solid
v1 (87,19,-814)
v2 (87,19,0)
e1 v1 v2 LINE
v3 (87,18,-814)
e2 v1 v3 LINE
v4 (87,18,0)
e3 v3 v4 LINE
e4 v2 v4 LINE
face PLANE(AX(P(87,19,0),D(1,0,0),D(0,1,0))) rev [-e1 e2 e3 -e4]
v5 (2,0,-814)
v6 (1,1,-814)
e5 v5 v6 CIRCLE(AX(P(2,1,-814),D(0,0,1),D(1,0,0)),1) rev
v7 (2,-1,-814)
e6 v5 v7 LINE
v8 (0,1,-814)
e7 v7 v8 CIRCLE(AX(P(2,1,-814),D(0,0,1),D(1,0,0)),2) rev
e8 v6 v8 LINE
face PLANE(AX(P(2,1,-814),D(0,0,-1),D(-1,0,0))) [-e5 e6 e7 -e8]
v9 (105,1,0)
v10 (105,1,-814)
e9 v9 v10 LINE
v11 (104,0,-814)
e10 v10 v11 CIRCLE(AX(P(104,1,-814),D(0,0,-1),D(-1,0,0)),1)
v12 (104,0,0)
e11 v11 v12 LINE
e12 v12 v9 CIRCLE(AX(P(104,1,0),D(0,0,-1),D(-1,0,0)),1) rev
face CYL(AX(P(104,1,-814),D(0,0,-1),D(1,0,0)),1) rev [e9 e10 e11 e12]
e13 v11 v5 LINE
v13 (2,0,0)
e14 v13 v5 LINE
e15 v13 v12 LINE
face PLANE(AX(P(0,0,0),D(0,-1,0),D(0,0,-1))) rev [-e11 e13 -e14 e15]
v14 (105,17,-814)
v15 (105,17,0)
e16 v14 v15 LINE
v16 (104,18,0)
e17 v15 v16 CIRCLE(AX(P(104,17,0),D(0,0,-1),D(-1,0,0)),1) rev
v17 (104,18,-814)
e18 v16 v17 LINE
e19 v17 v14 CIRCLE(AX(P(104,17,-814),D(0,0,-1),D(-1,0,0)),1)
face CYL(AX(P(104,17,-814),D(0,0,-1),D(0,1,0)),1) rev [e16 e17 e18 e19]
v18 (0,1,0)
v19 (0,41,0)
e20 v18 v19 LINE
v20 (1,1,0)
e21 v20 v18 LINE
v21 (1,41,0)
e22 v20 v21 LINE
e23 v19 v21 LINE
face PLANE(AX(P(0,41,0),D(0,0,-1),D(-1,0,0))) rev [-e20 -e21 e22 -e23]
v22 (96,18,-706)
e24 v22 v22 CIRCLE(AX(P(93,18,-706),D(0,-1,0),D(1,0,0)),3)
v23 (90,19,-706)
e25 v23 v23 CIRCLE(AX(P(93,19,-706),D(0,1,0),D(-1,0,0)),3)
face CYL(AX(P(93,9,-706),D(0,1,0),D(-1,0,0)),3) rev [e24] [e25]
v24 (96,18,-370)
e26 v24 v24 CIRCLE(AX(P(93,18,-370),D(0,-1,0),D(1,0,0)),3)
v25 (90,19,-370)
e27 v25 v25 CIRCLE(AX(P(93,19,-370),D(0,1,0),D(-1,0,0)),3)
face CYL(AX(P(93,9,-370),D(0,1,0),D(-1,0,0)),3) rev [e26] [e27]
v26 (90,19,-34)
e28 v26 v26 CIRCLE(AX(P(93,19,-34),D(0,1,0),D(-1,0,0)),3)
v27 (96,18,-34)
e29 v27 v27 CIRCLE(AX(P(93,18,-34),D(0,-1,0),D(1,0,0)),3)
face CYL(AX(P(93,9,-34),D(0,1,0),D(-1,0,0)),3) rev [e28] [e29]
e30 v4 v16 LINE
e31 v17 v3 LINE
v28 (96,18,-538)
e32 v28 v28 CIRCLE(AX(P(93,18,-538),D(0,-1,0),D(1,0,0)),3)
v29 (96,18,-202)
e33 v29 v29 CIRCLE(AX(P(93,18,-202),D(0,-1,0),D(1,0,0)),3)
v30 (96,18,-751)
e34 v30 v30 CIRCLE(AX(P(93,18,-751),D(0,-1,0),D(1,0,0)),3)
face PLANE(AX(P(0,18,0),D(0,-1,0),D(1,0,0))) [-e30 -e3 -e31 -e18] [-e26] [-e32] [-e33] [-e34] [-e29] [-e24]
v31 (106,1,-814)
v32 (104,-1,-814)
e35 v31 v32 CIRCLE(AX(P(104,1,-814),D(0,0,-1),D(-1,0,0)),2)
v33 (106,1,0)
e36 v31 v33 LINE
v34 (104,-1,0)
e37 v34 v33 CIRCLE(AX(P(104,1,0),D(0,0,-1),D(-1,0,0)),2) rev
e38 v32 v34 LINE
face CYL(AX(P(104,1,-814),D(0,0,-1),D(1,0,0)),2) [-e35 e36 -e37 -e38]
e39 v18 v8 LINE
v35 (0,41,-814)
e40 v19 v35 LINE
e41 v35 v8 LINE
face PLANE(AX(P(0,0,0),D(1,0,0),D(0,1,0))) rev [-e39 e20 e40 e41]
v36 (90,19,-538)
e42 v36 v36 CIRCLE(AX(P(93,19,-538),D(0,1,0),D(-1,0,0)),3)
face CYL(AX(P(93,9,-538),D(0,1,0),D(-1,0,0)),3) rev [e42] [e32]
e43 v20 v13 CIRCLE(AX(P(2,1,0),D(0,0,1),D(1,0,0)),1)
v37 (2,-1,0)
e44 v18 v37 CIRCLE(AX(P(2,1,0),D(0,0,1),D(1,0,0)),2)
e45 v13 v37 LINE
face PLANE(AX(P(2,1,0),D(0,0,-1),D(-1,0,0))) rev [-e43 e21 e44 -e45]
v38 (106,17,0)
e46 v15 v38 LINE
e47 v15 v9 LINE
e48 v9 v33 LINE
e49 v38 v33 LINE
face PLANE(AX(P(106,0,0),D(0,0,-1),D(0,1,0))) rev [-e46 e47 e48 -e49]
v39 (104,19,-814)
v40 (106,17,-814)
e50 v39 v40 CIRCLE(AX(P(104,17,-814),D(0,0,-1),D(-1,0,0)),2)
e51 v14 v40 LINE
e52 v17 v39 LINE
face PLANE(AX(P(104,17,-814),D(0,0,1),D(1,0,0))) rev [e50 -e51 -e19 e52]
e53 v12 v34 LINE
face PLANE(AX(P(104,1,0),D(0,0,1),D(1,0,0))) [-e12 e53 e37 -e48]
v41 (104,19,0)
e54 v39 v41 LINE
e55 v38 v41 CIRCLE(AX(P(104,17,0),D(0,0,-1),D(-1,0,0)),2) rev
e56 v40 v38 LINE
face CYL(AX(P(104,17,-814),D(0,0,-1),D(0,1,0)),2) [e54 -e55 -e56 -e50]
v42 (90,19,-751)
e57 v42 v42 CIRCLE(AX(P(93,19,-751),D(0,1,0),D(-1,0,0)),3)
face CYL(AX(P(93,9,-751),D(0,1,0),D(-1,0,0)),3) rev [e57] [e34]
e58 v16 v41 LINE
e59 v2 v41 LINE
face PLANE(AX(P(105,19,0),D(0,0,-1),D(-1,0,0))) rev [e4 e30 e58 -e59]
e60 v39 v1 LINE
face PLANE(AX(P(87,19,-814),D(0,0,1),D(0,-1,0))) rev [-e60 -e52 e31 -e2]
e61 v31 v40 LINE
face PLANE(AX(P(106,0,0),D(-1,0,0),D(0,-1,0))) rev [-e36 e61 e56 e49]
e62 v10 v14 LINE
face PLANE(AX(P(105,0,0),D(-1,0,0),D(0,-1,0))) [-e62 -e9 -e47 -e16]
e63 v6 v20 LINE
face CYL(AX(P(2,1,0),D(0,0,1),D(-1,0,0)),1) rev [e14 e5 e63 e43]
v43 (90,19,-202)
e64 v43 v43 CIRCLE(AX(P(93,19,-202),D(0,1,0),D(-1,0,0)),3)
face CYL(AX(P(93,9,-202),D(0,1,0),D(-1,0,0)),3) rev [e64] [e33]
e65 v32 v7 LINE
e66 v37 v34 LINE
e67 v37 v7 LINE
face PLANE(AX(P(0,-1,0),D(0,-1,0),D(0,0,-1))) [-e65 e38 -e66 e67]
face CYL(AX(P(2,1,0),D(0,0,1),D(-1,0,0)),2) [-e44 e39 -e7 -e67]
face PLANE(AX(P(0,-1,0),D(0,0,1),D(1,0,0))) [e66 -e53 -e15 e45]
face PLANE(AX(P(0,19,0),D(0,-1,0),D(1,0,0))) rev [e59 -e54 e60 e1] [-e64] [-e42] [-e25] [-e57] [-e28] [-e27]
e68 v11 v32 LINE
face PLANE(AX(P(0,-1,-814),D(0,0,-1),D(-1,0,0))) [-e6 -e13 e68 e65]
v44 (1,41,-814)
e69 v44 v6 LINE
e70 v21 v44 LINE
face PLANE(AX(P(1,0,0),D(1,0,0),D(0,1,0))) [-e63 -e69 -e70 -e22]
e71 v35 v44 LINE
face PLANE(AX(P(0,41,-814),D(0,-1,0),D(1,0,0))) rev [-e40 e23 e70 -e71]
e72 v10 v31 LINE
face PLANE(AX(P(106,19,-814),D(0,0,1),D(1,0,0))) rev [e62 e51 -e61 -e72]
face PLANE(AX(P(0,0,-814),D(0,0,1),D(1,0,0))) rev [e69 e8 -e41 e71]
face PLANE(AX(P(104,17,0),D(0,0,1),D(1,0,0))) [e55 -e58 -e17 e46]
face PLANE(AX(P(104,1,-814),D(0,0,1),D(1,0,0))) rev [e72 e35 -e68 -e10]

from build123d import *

# Parameters (mm, degrees)
SKETCH1_W                    = 106
SKETCH1_H                    = 814
BASE_FLANGE1_DEPTH           = 1
EDGE_FLANGE1_STRIP_W         = 6
EDGE_FLANGE1_STRIP_H         = 1
EDGE_FLANGE1_STRIP_CUT_DEPTH = 814
EDGE_FLANGE1_DEPTH           = 814
EDGE_FLANGE2_STRIP_W         = 6
EDGE_FLANGE2_STRIP_H         = 1
EDGE_FLANGE2_STRIP_CUT_DEPTH = 814
EDGE_FLANGE2_DEPTH           = 814
EDGE_FLANGE4_STRIP_W         = 6
EDGE_FLANGE4_STRIP_H         = 1
EDGE_FLANGE4_STRIP_CUT_DEPTH = 814
EDGE_FLANGE4_DEPTH           = 814
SKETCH19_R                   = 3
CUT_EXTRUDE2_DEPTH           = 10


# Sheet-metal steps are written as plain solids
with BuildPart() as part:
    # Sketch1 → Base-Flange1 (new body)
    with BuildSketch(Plane(origin=(0, 0, 0), x_dir=(1, 0, 0), z_dir=(0, 1, 0))):
        with Locations((53, 407)):
            Rectangle(SKETCH1_W, SKETCH1_H)
    extrude(amount=-BASE_FLANGE1_DEPTH)

    # Edge-Flange1 strip (across the edge) → Edge-Flange1 strip cut (cut)
    with BuildSketch(Plane(origin=(106, 0, 0), x_dir=(-1, 0, 0), z_dir=(0, 0, -1))):
        with Locations((-1, -0.5)):
            Rectangle(EDGE_FLANGE1_STRIP_W, EDGE_FLANGE1_STRIP_H)
    extrude(amount=EDGE_FLANGE1_STRIP_CUT_DEPTH, mode=Mode.SUBTRACT)

    # Edge-Flange1 section (across the edge) → Edge-Flange1 (add)
    with BuildSketch(Plane(origin=(106, 0, 0), x_dir=(-1, 0, 0), z_dir=(0, 0, -1))):
        with BuildLine():
            Line((0, 1), (0, 19))
            Line((0, 19), (1, 19))
            Line((1, 19), (1, 1))
            ThreePointArc((1, 1), (1.292893219, 0.292893219), (2, 0))
            Line((2, 0), (2, -1))
            ThreePointArc((2, -1), (0.585786438, -0.414213562), (0, 1))
        make_face()
    extrude(amount=EDGE_FLANGE1_DEPTH)

    # Edge-Flange2 strip (across the edge) → Edge-Flange2 strip cut (cut)
    with BuildSketch(Plane(origin=(105, 19, 0), x_dir=(0, -1, 0), z_dir=(0, 0, -1))):
        with Locations((-1, -0.5)):
            Rectangle(EDGE_FLANGE2_STRIP_W, EDGE_FLANGE2_STRIP_H)
    extrude(amount=EDGE_FLANGE2_STRIP_CUT_DEPTH, mode=Mode.SUBTRACT)

    # Edge-Flange2 section (across the edge) → Edge-Flange2 (add)
    with BuildSketch(Plane(origin=(105, 19, 0), x_dir=(0, -1, 0), z_dir=(0, 0, -1))):
        with BuildLine():
            Line((0, 1), (0, 18))
            Line((0, 18), (1, 18))
            Line((1, 18), (1, 1))
            ThreePointArc((1, 1), (1.292893219, 0.292893219), (2, 0))
            Line((2, 0), (2, -1))
            ThreePointArc((2, -1), (0.585786438, -0.414213562), (0, 1))
        make_face()
    extrude(amount=EDGE_FLANGE2_DEPTH)

    # Edge-Flange4 strip (across the edge) → Edge-Flange4 strip cut (cut)
    with BuildSketch(Plane.XY.offset(-814)):
        with Locations((-1, -0.5)):
            Rectangle(EDGE_FLANGE4_STRIP_W, EDGE_FLANGE4_STRIP_H)
    extrude(amount=EDGE_FLANGE4_STRIP_CUT_DEPTH, mode=Mode.SUBTRACT)

    # Edge-Flange4 section (across the edge) → Edge-Flange4 (add)
    with BuildSketch(Plane.XY.offset(-814)):
        with BuildLine():
            Line((0, 1), (0, 41))
            Line((0, 41), (1, 41))
            Line((1, 41), (1, 1))
            ThreePointArc((1, 1), (1.292893219, 0.292893219), (2, 0))
            Line((2, 0), (2, -1))
            ThreePointArc((2, -1), (0.585786438, -0.414213562), (0, 1))
        make_face()
    extrude(amount=EDGE_FLANGE4_DEPTH)

    # Sketch19 → Cut-Extrude2 (cut)
    with BuildSketch(Plane(origin=(0, 19, 0), x_dir=(1, 0, 0), z_dir=(0, 1, 0))):
        with Locations(Location((93, 751, 0), (0, 0, 180))):
            Circle(SKETCH19_R)
        with Locations(Location((93, 706, 0), (0, 0, 180))):
            Circle(SKETCH19_R)
        with Locations(Location((93, 538, 0), (0, 0, 180))):
            Circle(SKETCH19_R)
        with Locations(Location((93, 370, 0), (0, 0, 180))):
            Circle(SKETCH19_R)
        with Locations(Location((93, 202, 0), (0, 0, 180))):
            Circle(SKETCH19_R)
        with Locations(Location((93, 34, 0), (0, 0, 180))):
            Circle(SKETCH19_R)
    extrude(amount=-CUT_EXTRUDE2_DEPTH, mode=Mode.SUBTRACT)


solid = part.part
